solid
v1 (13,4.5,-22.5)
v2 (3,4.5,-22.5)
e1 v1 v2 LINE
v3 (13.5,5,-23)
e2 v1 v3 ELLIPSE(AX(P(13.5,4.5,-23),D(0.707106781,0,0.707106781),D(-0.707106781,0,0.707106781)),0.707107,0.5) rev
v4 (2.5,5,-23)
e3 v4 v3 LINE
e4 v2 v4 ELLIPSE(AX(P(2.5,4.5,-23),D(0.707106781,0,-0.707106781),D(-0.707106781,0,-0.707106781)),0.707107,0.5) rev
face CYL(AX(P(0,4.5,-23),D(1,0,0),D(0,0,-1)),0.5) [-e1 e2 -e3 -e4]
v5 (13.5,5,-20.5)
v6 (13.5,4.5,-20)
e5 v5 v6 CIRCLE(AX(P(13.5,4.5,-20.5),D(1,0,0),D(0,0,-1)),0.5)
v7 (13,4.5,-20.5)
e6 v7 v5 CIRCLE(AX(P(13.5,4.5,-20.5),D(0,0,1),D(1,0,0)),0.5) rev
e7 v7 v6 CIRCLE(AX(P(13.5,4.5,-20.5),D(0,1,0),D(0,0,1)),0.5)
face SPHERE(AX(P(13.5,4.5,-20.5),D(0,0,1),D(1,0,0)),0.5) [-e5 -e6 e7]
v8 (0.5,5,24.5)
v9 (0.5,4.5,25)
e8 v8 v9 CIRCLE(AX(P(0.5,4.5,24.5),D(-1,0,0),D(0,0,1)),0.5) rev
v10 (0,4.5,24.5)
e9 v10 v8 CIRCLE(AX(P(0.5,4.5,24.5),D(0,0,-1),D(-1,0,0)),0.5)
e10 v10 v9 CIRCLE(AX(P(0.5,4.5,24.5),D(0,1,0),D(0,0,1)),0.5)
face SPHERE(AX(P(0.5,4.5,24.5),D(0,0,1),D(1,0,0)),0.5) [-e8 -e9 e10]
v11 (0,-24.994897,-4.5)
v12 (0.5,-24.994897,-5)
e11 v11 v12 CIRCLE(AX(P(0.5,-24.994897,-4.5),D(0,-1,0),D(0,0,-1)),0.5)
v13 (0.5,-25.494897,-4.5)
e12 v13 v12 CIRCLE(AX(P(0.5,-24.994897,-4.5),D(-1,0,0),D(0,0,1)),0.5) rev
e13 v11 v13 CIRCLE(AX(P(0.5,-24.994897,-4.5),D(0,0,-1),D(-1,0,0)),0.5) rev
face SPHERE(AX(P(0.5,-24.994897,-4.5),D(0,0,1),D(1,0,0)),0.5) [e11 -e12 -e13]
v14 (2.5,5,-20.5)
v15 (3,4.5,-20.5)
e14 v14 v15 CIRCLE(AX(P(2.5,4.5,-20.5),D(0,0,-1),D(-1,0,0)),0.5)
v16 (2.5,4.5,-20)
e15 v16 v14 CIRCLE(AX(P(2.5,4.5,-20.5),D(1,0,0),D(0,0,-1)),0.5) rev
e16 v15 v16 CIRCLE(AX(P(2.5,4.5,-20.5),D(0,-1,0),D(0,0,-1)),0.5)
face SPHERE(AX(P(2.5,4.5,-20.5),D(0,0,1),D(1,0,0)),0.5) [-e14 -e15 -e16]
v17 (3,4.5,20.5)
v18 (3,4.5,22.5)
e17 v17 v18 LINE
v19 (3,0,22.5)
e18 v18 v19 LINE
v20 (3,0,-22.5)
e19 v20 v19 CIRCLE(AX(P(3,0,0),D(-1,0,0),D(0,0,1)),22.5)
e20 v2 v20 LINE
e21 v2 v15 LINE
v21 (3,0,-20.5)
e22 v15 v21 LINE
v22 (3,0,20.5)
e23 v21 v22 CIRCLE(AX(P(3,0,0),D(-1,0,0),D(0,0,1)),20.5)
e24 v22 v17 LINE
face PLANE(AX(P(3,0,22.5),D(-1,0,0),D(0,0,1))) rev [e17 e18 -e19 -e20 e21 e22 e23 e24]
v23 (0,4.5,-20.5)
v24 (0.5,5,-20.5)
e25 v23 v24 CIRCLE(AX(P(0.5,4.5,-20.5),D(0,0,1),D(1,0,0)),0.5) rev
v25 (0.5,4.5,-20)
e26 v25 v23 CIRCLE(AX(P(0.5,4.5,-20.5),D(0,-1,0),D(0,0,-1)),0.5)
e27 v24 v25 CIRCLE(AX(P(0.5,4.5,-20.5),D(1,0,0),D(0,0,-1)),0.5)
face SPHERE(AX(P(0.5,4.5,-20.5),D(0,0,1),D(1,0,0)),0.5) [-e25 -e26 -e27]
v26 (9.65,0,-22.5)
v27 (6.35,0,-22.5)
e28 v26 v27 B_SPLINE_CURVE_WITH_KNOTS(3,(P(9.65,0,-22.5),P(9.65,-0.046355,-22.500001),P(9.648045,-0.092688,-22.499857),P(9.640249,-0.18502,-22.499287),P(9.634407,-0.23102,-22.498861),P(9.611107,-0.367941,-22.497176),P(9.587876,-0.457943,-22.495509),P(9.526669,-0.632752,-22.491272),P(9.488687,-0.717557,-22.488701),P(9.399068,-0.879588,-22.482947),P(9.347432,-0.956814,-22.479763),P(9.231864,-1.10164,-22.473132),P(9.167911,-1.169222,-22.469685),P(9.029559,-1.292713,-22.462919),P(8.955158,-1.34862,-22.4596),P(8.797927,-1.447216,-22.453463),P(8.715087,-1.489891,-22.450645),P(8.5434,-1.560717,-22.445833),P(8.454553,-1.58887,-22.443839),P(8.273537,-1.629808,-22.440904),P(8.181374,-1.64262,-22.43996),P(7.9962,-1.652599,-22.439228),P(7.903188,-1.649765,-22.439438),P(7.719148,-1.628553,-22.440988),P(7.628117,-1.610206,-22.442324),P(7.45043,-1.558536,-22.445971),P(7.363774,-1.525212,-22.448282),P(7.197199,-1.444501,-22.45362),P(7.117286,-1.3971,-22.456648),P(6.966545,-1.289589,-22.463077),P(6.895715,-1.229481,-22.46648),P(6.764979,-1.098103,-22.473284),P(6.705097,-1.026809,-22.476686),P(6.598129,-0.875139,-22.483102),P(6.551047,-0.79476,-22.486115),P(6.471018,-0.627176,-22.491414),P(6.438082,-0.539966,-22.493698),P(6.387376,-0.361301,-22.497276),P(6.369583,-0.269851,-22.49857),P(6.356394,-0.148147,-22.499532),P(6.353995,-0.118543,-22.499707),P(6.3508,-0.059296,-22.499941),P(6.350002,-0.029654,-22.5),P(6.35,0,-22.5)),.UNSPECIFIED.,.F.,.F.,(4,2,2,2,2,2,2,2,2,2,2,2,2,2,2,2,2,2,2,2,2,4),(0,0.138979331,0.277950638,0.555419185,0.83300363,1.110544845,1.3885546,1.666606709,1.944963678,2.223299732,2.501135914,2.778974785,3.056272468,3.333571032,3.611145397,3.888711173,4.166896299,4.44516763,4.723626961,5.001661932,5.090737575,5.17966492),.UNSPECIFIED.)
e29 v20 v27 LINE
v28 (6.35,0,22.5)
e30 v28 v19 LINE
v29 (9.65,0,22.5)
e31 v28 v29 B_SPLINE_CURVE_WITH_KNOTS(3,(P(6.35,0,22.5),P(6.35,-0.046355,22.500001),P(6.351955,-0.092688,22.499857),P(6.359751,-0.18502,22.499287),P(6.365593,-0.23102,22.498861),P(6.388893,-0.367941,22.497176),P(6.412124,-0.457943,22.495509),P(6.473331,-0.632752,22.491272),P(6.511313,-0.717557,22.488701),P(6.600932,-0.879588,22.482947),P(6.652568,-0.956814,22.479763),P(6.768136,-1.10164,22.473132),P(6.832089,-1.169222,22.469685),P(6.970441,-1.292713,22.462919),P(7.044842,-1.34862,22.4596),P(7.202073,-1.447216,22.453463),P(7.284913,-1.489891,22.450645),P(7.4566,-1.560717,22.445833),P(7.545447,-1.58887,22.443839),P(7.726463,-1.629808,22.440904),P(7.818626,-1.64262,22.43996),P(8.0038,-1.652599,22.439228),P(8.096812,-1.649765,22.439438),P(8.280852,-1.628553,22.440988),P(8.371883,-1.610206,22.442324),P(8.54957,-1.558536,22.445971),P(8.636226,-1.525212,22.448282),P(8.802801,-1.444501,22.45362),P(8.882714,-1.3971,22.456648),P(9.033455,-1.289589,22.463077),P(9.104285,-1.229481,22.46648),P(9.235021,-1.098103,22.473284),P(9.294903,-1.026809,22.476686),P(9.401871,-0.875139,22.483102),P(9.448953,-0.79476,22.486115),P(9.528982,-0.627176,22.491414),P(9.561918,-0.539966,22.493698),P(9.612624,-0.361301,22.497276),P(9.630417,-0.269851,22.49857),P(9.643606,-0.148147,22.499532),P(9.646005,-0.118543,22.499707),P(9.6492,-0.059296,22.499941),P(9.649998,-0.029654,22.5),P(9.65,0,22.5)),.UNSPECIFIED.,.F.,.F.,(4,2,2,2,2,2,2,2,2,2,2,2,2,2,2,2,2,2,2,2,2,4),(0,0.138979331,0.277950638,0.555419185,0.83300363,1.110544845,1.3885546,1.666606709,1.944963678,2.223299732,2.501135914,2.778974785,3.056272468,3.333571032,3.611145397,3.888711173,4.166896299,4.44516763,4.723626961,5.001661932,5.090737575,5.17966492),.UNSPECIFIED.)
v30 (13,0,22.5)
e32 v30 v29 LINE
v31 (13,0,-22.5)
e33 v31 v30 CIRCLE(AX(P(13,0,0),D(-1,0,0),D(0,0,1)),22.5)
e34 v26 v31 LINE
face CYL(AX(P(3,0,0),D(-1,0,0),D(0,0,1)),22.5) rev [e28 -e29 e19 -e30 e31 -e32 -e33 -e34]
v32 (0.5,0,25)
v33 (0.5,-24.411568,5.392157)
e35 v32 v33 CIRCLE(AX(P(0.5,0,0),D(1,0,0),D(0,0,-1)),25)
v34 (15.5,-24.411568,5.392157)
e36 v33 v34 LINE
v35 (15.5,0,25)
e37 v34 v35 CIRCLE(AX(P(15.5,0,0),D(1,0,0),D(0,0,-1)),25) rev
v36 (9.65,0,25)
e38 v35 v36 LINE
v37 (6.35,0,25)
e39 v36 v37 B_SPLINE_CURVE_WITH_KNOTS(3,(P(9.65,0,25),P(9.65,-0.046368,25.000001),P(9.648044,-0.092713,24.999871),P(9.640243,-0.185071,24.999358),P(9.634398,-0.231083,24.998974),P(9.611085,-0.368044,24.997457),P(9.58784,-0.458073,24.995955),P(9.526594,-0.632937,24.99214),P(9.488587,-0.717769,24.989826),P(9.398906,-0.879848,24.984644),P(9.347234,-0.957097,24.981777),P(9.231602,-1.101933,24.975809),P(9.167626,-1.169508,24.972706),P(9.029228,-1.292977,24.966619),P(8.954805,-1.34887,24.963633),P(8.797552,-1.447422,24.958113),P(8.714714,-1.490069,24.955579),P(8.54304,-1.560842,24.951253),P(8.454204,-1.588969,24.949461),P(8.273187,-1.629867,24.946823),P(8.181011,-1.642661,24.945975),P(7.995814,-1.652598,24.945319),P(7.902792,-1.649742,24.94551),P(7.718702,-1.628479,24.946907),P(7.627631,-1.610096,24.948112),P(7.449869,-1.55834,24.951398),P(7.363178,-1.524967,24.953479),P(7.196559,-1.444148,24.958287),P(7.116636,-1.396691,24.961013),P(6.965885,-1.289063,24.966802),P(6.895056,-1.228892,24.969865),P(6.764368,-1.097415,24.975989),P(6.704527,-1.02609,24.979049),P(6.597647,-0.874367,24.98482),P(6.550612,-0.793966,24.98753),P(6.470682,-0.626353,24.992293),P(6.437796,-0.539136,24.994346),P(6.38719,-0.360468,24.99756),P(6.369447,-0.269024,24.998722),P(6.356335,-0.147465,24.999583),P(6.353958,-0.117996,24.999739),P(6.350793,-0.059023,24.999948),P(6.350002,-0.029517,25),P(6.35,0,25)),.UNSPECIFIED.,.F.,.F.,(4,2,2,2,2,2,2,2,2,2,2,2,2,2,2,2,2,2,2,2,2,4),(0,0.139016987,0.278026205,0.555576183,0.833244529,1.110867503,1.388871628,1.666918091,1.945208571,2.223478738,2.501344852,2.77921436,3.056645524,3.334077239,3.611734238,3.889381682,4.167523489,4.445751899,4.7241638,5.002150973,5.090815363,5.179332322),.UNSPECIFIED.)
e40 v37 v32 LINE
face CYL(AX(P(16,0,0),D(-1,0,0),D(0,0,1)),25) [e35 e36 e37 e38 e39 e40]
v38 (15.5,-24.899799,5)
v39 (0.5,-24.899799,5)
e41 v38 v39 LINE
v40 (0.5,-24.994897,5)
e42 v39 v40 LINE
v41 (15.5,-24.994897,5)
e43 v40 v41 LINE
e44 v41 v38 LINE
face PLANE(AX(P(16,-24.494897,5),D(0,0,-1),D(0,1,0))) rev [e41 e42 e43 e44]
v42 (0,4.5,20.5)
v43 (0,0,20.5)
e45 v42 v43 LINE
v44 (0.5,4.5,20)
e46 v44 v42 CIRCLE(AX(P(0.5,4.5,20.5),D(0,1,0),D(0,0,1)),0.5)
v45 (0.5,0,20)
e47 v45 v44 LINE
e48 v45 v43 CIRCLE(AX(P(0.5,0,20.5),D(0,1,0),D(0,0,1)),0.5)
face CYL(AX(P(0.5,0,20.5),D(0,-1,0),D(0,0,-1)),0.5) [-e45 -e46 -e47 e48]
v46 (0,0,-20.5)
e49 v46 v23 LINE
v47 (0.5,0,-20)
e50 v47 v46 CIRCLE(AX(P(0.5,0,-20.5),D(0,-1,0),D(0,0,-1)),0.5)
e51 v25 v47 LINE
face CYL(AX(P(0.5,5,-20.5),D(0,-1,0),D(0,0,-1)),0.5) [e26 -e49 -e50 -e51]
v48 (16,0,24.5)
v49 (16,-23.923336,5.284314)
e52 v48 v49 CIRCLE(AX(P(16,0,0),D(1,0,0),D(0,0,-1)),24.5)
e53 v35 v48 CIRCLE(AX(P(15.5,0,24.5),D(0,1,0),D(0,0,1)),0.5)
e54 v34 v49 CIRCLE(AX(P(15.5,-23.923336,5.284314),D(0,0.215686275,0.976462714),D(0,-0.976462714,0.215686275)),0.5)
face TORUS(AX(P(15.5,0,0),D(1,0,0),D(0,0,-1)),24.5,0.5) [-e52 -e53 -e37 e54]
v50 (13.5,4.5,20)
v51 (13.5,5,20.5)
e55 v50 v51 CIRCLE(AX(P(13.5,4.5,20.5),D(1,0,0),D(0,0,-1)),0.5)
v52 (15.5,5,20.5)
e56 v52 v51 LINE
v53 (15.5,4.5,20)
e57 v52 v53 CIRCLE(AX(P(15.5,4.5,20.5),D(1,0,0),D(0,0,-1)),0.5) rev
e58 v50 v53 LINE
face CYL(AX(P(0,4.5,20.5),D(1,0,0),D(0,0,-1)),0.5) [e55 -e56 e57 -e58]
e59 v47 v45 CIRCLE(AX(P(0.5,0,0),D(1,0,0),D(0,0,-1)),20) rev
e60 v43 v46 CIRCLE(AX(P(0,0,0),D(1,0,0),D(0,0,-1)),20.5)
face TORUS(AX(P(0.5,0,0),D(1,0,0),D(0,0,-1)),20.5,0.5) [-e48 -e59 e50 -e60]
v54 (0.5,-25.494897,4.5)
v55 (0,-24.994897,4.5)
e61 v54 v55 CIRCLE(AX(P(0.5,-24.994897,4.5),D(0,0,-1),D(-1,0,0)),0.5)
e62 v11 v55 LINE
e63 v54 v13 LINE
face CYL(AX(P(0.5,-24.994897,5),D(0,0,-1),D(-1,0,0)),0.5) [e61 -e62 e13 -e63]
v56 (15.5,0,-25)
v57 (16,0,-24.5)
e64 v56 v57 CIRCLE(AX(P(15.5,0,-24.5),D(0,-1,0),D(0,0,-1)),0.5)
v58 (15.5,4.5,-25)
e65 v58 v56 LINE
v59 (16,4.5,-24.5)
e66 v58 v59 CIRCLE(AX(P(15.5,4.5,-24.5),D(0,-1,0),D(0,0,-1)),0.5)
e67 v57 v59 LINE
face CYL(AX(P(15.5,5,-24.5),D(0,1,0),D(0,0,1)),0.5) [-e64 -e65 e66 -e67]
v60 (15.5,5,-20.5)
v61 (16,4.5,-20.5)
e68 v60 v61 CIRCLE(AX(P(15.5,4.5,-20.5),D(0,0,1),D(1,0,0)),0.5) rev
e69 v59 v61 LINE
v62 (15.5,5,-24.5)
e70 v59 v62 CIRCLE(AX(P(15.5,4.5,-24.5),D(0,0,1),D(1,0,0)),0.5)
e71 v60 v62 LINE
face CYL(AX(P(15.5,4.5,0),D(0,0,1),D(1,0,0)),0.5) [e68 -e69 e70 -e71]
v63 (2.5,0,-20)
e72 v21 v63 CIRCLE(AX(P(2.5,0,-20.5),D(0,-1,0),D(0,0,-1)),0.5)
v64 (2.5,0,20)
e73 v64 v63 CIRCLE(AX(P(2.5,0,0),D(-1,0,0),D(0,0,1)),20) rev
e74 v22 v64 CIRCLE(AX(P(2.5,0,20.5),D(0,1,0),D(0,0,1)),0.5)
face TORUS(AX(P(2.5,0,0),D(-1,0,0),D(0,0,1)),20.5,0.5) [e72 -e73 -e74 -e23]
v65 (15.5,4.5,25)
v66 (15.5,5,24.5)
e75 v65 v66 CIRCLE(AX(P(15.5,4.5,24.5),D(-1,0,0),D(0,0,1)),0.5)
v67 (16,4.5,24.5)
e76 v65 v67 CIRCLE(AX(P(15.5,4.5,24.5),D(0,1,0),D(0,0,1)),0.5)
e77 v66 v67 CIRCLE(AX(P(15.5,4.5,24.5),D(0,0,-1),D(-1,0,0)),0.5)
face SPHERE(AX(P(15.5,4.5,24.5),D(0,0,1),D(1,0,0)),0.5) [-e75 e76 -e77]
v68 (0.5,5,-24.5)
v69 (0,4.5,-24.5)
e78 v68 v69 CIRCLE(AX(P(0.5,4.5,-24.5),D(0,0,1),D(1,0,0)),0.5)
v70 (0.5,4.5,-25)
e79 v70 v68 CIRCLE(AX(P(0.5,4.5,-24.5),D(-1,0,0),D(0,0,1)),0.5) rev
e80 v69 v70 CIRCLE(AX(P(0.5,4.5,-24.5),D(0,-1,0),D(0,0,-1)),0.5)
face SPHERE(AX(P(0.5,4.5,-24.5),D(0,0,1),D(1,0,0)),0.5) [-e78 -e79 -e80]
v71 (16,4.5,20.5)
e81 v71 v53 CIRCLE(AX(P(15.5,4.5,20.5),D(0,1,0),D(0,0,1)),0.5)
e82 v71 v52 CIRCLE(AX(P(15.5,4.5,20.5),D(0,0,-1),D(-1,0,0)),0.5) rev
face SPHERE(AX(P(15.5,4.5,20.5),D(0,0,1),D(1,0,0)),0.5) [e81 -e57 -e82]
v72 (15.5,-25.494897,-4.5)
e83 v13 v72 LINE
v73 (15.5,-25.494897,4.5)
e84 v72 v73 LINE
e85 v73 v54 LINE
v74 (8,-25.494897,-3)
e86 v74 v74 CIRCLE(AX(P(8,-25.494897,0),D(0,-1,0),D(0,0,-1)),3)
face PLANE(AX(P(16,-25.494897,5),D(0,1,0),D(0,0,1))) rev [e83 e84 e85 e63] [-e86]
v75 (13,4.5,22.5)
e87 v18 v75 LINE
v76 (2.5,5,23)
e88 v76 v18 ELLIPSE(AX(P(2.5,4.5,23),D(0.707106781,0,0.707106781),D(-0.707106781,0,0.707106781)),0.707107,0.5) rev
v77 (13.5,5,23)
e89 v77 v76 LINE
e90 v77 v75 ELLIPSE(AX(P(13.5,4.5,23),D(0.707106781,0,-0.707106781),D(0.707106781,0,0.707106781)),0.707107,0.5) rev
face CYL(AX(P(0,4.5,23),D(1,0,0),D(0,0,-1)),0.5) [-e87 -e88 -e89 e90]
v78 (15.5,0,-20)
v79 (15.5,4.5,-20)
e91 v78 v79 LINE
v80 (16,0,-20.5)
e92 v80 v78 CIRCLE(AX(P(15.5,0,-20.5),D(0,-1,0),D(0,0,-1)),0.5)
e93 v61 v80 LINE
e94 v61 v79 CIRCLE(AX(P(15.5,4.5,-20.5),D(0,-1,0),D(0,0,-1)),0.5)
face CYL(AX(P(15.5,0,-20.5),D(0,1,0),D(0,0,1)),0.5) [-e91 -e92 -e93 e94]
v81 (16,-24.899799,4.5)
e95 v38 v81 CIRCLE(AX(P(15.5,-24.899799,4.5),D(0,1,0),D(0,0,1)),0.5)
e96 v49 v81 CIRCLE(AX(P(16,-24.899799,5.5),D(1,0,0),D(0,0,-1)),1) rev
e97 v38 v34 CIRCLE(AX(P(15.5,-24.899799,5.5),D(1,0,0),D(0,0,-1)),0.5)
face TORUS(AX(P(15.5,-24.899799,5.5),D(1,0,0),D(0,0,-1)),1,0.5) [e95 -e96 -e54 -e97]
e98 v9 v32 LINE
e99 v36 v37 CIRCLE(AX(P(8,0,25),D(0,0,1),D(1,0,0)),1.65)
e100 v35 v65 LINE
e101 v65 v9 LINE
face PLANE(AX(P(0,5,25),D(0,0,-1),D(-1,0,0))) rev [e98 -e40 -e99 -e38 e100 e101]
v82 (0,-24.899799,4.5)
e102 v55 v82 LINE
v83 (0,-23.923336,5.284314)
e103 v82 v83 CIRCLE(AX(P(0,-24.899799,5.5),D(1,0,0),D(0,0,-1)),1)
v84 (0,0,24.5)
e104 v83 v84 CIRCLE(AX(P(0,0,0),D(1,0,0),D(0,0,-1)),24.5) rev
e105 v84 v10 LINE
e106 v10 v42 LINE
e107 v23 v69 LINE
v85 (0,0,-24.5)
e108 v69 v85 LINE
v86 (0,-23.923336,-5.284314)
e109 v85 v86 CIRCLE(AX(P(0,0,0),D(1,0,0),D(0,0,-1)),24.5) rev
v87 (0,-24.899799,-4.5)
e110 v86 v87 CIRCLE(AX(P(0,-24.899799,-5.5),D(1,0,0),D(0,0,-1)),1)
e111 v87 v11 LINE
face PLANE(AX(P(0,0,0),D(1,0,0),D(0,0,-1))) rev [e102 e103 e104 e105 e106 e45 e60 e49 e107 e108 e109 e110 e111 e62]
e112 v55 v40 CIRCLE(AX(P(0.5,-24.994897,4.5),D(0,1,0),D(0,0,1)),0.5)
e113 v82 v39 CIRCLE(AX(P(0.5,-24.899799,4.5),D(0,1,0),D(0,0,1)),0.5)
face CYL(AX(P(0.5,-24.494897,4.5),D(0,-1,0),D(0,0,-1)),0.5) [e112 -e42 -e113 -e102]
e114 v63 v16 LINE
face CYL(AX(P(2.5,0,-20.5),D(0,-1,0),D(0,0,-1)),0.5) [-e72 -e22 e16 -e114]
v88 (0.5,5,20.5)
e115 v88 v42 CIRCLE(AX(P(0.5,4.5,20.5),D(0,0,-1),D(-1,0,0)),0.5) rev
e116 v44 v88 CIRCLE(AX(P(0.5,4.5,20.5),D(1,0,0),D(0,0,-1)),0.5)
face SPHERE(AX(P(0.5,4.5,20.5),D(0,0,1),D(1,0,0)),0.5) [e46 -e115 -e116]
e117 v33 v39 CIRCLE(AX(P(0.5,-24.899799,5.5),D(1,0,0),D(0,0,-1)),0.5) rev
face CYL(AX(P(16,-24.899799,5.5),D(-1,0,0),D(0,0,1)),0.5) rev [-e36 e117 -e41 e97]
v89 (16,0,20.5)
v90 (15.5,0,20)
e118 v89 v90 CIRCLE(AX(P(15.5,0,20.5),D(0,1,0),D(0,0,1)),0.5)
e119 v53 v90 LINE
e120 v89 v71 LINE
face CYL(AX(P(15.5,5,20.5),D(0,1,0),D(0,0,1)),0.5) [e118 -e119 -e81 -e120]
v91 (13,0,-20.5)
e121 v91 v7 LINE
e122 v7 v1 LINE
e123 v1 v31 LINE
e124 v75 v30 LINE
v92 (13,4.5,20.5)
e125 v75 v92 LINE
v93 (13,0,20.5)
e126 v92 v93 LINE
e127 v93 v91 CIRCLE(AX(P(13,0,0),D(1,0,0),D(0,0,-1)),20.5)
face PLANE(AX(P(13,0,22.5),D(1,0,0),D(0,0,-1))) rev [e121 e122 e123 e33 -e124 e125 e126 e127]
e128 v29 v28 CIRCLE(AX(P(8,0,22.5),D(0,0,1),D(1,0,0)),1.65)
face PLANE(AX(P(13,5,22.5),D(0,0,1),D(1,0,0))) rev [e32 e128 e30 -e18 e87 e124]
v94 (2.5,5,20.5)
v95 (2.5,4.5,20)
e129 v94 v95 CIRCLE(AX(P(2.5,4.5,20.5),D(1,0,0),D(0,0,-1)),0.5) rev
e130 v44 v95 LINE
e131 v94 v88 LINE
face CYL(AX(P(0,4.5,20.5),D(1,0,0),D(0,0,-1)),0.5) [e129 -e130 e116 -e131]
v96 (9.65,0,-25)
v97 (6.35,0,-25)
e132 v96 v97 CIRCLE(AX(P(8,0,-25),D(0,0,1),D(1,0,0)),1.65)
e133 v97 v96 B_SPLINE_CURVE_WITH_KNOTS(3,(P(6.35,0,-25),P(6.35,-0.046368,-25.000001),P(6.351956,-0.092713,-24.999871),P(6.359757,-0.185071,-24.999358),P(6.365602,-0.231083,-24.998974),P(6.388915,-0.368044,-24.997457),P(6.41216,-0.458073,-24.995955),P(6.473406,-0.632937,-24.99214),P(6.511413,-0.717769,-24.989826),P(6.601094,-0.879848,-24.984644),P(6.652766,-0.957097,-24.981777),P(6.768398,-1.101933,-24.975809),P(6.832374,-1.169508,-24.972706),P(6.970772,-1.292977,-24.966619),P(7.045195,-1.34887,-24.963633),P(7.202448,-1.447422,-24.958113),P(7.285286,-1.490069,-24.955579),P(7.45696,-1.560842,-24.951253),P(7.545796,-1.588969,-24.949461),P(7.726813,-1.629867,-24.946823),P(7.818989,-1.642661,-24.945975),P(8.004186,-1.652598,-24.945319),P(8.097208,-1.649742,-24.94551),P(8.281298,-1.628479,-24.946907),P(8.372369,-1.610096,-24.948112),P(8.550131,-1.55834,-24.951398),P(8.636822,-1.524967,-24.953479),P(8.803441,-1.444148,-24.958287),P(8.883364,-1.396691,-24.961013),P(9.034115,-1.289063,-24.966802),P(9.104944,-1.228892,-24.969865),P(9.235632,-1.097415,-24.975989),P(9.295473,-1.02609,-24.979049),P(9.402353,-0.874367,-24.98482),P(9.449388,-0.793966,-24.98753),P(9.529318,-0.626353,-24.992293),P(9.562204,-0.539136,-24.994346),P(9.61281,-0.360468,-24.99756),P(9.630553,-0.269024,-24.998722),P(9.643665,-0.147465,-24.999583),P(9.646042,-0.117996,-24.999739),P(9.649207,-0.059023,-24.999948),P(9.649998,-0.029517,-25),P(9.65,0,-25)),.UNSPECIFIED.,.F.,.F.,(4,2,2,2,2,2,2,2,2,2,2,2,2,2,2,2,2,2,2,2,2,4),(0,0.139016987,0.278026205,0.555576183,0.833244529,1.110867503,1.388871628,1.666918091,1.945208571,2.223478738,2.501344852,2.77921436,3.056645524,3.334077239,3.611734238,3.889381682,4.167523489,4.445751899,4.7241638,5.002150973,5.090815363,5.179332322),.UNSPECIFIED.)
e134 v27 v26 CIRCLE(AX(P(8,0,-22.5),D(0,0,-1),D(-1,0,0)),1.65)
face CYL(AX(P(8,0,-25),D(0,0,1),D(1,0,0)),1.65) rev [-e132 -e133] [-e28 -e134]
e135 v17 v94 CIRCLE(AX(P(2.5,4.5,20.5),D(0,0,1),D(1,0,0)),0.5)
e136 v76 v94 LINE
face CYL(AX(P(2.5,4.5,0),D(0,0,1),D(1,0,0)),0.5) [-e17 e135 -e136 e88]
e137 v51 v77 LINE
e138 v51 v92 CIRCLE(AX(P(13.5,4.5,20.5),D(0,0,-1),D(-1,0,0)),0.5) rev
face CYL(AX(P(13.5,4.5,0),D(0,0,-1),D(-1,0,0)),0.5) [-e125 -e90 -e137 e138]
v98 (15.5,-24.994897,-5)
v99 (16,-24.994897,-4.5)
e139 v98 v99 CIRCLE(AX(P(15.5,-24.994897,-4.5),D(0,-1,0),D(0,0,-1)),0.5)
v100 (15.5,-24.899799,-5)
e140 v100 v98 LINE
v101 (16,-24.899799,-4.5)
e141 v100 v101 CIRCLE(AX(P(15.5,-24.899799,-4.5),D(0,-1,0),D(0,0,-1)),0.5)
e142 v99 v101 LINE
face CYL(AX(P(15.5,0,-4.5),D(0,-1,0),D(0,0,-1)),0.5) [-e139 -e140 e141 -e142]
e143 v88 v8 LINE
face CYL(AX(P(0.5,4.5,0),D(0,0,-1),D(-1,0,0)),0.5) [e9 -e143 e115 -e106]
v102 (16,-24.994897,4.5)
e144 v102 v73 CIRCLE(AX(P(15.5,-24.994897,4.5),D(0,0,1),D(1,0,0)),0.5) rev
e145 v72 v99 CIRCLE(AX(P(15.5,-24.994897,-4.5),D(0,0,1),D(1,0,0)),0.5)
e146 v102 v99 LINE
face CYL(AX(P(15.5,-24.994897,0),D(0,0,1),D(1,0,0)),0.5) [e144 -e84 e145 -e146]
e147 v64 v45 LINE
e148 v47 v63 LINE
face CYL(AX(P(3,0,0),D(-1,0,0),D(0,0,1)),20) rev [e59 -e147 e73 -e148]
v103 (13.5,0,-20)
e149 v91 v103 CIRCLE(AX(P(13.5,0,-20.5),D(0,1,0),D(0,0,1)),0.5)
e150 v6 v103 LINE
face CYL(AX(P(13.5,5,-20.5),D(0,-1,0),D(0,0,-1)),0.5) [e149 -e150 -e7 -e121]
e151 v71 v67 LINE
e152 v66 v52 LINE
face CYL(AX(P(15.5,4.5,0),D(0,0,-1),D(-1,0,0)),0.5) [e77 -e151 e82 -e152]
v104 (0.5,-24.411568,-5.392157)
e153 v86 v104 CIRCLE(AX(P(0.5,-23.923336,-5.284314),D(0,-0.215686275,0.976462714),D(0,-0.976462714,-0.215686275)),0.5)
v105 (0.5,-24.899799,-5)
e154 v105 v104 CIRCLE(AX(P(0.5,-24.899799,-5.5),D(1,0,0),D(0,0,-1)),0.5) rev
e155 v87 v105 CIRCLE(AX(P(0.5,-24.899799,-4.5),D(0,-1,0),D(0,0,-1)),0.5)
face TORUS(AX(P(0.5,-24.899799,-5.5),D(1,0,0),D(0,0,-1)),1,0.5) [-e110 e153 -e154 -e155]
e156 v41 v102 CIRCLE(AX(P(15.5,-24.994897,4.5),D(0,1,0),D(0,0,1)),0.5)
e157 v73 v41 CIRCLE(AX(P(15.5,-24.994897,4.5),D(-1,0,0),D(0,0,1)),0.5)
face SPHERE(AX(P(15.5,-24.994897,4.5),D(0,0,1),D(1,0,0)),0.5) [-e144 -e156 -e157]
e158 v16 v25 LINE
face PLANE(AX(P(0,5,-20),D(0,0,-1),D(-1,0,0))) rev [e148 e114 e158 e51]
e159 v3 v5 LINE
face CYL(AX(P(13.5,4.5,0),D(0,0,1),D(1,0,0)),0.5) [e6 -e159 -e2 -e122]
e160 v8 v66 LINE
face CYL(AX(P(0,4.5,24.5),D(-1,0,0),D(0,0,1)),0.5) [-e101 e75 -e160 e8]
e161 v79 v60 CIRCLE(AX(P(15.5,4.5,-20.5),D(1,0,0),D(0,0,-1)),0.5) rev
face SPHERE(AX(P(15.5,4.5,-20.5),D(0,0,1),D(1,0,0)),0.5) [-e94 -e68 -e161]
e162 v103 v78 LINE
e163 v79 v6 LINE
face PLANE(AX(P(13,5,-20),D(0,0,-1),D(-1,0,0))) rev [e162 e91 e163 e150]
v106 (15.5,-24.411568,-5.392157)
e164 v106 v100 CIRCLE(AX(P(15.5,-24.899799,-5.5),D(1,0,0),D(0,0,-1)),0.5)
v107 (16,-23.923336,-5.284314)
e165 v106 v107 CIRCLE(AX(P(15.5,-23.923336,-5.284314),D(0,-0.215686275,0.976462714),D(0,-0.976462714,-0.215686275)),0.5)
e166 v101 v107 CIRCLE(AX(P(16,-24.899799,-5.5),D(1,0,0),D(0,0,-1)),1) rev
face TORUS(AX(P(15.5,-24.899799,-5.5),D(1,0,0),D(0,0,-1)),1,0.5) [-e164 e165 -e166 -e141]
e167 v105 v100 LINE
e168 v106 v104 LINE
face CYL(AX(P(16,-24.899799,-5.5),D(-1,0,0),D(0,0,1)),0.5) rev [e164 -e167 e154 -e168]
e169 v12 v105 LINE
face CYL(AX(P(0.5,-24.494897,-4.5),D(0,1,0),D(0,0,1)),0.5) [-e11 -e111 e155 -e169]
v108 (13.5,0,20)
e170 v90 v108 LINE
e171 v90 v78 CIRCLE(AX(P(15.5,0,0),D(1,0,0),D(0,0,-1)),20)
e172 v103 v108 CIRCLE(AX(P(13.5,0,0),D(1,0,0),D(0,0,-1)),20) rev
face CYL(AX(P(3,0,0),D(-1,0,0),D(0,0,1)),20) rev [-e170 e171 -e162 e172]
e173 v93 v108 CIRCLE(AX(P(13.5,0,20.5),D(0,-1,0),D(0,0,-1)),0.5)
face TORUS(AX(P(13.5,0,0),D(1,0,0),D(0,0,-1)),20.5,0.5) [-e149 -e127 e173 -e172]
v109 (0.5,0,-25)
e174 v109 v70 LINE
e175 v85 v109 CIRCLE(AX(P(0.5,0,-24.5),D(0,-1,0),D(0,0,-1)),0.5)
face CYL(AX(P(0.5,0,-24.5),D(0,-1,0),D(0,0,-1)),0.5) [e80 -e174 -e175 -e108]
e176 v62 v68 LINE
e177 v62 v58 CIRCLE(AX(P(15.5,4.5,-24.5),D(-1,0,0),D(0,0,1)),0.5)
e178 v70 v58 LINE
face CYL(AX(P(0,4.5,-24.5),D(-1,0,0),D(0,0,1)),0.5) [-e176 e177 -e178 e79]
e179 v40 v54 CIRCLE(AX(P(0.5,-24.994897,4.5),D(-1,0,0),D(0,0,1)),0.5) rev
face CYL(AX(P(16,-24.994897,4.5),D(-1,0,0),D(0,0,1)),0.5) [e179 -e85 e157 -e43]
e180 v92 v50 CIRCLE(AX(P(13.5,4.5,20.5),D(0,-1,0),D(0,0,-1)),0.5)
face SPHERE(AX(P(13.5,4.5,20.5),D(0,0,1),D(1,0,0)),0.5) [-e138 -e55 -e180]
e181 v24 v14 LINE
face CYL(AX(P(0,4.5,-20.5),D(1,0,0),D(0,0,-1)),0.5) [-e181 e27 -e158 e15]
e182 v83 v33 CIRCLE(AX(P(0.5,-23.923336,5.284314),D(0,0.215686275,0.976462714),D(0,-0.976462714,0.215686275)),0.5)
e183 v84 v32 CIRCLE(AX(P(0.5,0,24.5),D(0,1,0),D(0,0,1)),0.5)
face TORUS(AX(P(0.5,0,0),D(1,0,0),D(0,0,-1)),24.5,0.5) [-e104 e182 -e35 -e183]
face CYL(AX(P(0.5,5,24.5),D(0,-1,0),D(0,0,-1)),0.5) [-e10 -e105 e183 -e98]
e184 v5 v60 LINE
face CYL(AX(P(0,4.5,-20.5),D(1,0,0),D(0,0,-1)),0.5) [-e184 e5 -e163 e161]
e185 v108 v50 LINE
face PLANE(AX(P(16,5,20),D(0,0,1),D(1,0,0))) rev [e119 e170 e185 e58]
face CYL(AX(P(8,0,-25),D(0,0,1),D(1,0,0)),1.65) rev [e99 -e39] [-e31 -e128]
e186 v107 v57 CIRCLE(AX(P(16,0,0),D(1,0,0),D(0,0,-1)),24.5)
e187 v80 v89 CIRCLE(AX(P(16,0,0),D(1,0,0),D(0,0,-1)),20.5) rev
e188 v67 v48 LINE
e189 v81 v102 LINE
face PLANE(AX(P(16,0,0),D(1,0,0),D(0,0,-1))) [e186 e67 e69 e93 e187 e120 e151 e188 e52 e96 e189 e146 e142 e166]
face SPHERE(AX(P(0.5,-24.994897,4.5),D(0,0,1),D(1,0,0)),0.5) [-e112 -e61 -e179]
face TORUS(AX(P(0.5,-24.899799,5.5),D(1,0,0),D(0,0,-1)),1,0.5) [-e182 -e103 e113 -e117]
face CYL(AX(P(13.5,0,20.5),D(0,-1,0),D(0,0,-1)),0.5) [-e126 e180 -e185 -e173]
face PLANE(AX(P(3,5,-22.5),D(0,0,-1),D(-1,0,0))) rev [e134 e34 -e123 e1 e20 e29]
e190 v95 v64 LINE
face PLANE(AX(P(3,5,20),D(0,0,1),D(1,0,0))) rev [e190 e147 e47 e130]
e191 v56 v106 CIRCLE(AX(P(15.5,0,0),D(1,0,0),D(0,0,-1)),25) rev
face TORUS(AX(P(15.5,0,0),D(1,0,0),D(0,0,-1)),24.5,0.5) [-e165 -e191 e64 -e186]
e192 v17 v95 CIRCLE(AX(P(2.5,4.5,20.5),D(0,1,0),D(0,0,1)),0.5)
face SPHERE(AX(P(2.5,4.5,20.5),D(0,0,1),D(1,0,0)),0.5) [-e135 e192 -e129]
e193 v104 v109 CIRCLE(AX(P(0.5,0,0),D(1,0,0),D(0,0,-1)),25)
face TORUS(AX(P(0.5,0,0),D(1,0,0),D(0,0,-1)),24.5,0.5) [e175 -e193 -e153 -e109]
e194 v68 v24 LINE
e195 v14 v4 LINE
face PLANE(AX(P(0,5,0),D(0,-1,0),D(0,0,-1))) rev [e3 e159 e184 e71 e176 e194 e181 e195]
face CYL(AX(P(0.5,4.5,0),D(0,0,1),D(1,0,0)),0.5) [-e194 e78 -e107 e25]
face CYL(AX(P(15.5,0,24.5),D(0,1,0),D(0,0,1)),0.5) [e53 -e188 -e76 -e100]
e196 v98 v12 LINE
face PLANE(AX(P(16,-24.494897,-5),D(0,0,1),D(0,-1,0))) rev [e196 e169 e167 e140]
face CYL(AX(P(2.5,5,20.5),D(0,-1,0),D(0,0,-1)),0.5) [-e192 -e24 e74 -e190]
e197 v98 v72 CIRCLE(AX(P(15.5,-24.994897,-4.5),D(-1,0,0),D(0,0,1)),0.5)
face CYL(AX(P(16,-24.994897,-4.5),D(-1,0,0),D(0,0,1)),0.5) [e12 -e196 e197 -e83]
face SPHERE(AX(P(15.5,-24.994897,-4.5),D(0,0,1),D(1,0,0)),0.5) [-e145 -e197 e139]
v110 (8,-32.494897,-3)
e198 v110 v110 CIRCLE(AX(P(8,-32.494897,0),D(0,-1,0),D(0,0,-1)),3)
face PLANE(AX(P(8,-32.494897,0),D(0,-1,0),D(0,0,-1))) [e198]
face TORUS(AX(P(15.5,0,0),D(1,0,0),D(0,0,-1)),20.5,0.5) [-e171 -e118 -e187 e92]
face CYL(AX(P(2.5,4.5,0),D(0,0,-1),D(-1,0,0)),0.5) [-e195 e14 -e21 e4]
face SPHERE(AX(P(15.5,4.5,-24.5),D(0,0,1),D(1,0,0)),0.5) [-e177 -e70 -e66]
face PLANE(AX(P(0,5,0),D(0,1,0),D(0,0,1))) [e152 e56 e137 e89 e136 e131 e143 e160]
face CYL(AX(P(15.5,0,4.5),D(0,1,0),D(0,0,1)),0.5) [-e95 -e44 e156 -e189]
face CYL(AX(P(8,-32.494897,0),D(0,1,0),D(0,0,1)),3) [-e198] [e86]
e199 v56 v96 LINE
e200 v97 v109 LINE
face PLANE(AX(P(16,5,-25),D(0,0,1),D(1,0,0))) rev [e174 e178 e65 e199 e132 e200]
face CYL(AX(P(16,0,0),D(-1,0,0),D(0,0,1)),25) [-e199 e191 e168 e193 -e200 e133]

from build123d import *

# Parameters (mm, degrees)
BOSS_EXTRUDE1_DEPTH = 16
SKETCH4_R           = 2.999999999999999
BOSS_EXTRUDE2_DEPTH = 7
BOSS_EXTRUDE3_DEPTH = 5
SKETCH19_R          = 1.6500000000000006
CUT_EXTRUDE1_DEPTH  = 62.74073500409036
FILLET3_R           = 0.5
FILLET5_R           = 0.5
FILLET6_R           = 0.5


with BuildPart() as part:
    # Sketch1 → Boss-Extrude1 (new body)
    with BuildSketch(Plane(origin=(0, 0, 0), x_dir=(0, 0, -1), z_dir=(1, 0, 0))):
        with BuildLine():
            Line((-25, 0), (25, 0))
            ThreePointArc((25, 0), (19.364916731037084, -15.811388300841896), (4.999999999999999, -24.49489742783178))
            Line((4.999999999999999, -24.49489742783178), (5, -25.494897427831784))
            Line((5, -25.494897427831784), (-5, -25.494897427831784))
            Line((-5, -25.494897427831784), (-4.999999999999999, -24.49489742783178))
            ThreePointArc((-4.999999999999999, -24.49489742783178), (-19.364916731037088, -15.811388300841891), (-25, 0))
        make_face()
    extrude(amount=BOSS_EXTRUDE1_DEPTH)

    # Sketch2 → Cut-Revolve3 (revolve, cut)
    with BuildSketch(Plane(origin=(0, 0, 0), x_dir=(1, 0, 0), z_dir=(0, 1, 0))):
        Polygon((2.999999999999999, -22.5), (12.999999999999995, -22.5), (13.000000000000002, -20), (16, -20), (16, 0), (13.000000000000002, 0), (3, 0), (0, 0), (0, -20), (2.999999999999999, -20), align=None)
    revolve(axis=Axis((3, 0, 0), (1, 0, 0)), mode=Mode.SUBTRACT)

    # Sketch4 → Boss-Extrude2 (add)
    with BuildSketch(Plane.XZ.offset(25.494897427831784)):
        with Locations(Location((8, 0, 0), (0, 0, 270))):
            Circle(SKETCH4_R)
    extrude(amount=BOSS_EXTRUDE2_DEPTH)

    # Sketch18 → Boss-Extrude3 (add)
    with BuildSketch(Plane(origin=(0, 0, 0), x_dir=(1, 0, 0), z_dir=(0, 1, 0))):
        Polygon((16, -25), (16, -20), (13.000000000000002, -20), (12.999999999999995, -22.5), (2.999999999999999, -22.5), (2.999999999999999, -20), (0, -20), (0, -25), align=None)
        Polygon((12.999999999999995, 22.5), (13.000000000000002, 20), (16, 20), (16, 25), (0, 25), (0, 20), (2.999999999999999, 20), (2.999999999999999, 22.5), align=None)
    extrude(amount=BOSS_EXTRUDE3_DEPTH)

    # Sketch19 → Cut-Extrude1 (cut, through all)
    with BuildSketch(Plane.XY.offset(25)):
        with Locations((8, 0)):
            Circle(SKETCH19_R)
    extrude(amount=-CUT_EXTRUDE1_DEPTH, mode=Mode.SUBTRACT)

    # Fillet3
    fillet3_edges = [part.edges().sort_by_distance(p)[0] for p in [
        (8, -24.49489742783178, -5),
        (8, -25.494897427831784, -5),
        (8, -25.494897427831784, 5),
        (8, -24.49489742783178, 5),
        (16, -25.494897427831784, 0),
        (8, 5, 25),
        (16, 5, 22.5),
        (14.5, 5, 20),
        (12.999999999999998, 5, 21.25),
        (7.9999999999999964, 5, 22.5),
        (2.999999999999999, 5, 21.25),
        (1.4999999999999996, 5, 20),
        (0, 5, 22.5),
        (7.999999999999997, 5, -22.5),
        (12.999999999999998, 5, -21.25),
        (14.5, 5, -20),
        (16, 5, -22.5),
        (8, 5, -25),
        (0, 5, -22.5),
        (1.4999999999999996, 5, -20),
        (2.999999999999999, 5, -21.25),
        (0, -25.494897427831784, 0),
    ]]
    fillet(fillet3_edges, radius=FILLET3_R)

    # Fillet5
    # the kernel refuses this fillet: 0.5 mm, written as the material it takes off along each edge
    with BuildSketch(Plane(origin=(13.500000000000117, 4.5, 20.5), x_dir=(-1, 0, 2.84e-15), z_dir=(0, 0, -1))) as fillet5_piece_1_section:
        Polygon((0, 0), (FILLET5_R, 0), (FILLET5_R, FILLET5_R), (0, FILLET5_R), align=None)
    fillet5_piece_1 = extrude(amount=FILLET5_R, mode=Mode.PRIVATE)
    fillet5_piece_1 = fillet5_piece_1 - Plane(origin=(13.500000000000117, 4.5, 20.5), x_dir=(0.7071067811865475, -0.7071067811865475, -2.009718347115232e-15), z_dir=(0, 0, -1)) * Sphere(FILLET5_R, mode=Mode.PRIVATE)
    add(fillet5_piece_1, mode=Mode.SUBTRACT)
    with BuildSketch(Plane(origin=(15.5, 4.5, 20.5), x_dir=(0, 0, -1), z_dir=(1, 0, 0))) as fillet5_piece_2_section:
        Polygon((0, 0), (FILLET5_R, 0), (FILLET5_R, FILLET5_R), (0, FILLET5_R), align=None)
    fillet5_piece_2 = extrude(amount=FILLET5_R, mode=Mode.PRIVATE)
    fillet5_piece_2 = fillet5_piece_2 - Plane(origin=(15.5, 4.5, 20.5), x_dir=(0, -0.7071067811865475, 0.7071067811865475), z_dir=(1, 0, 0)) * Sphere(FILLET5_R, mode=Mode.PRIVATE)
    add(fillet5_piece_2, mode=Mode.SUBTRACT)
    with BuildSketch(Plane(origin=(2.499999999999999, 4.5, 20.5), x_dir=(1, 0, 0), z_dir=(0, 0, -1))) as fillet5_piece_3_section:
        Polygon((0, 0), (FILLET5_R, 0), (FILLET5_R, -FILLET5_R), (0, -FILLET5_R), align=None)
    fillet5_piece_3 = extrude(amount=FILLET5_R, mode=Mode.PRIVATE)
    fillet5_piece_3 = fillet5_piece_3 - Plane(origin=(2.499999999999999, 4.5, 20.5), x_dir=(-0.7071067811865475, -0.7071067811865475, 0), z_dir=(0, 0, -1)) * Sphere(FILLET5_R, mode=Mode.PRIVATE)
    add(fillet5_piece_3, mode=Mode.SUBTRACT)
    with BuildSketch(Plane(origin=(0.5, 4.5, 20.5), x_dir=(0, 0, -1), z_dir=(-1, 0, 0))) as fillet5_piece_4_section:
        Polygon((0, 0), (FILLET5_R, 0), (FILLET5_R, -FILLET5_R), (0, -FILLET5_R), align=None)
    fillet5_piece_4 = extrude(amount=FILLET5_R, mode=Mode.PRIVATE)
    fillet5_piece_4 = fillet5_piece_4 - Plane(origin=(0.5, 4.5, 20.5), x_dir=(0, -0.7071067811865475, 0.7071067811865475), z_dir=(-1, 0, 0)) * Sphere(FILLET5_R, mode=Mode.PRIVATE)
    add(fillet5_piece_4, mode=Mode.SUBTRACT)
    with BuildSketch(Plane(origin=(15.5, 4.5, -20.5), x_dir=(0, 0, 1), z_dir=(1, 0, 0))) as fillet5_piece_5_section:
        Polygon((0, 0), (FILLET5_R, 0), (FILLET5_R, -FILLET5_R), (0, -FILLET5_R), align=None)
    fillet5_piece_5 = extrude(amount=FILLET5_R, mode=Mode.PRIVATE)
    fillet5_piece_5 = fillet5_piece_5 - Plane(origin=(15.5, 4.5, -20.5), x_dir=(0, -0.7071067811865475, -0.7071067811865475), z_dir=(1, 0, 0)) * Sphere(FILLET5_R, mode=Mode.PRIVATE)
    add(fillet5_piece_5, mode=Mode.SUBTRACT)
    with BuildSketch(Plane(origin=(13.5, 4.5, -20.5), x_dir=(-1, 0, 2.84e-15), z_dir=(0, 0, 1))) as fillet5_piece_6_section:
        Polygon((0, 0), (FILLET5_R, 0), (FILLET5_R, -FILLET5_R), (0, -FILLET5_R), align=None)
    fillet5_piece_6 = extrude(amount=FILLET5_R, mode=Mode.PRIVATE)
    fillet5_piece_6 = fillet5_piece_6 - Plane(origin=(13.5, 4.5, -20.5), x_dir=(0.7071067811865475, -0.7071067811865475, -2.009718347115232e-15), z_dir=(0, 0, 1)) * Sphere(FILLET5_R, mode=Mode.PRIVATE)
    add(fillet5_piece_6, mode=Mode.SUBTRACT)
    with BuildSketch(Plane(origin=(0.5, 4.5, -20.5), x_dir=(0, 0, 1), z_dir=(-1, 0, 0))) as fillet5_piece_7_section:
        Polygon((0, 0), (FILLET5_R, 0), (FILLET5_R, FILLET5_R), (0, FILLET5_R), align=None)
    fillet5_piece_7 = extrude(amount=FILLET5_R, mode=Mode.PRIVATE)
    fillet5_piece_7 = fillet5_piece_7 - Plane(origin=(0.5, 4.5, -20.5), x_dir=(0, -0.7071067811865475, -0.7071067811865475), z_dir=(-1, 0, 0)) * Sphere(FILLET5_R, mode=Mode.PRIVATE)
    add(fillet5_piece_7, mode=Mode.SUBTRACT)
    with BuildSketch(Plane(origin=(2.499999999999999, 4.5, -20.5), x_dir=(1, 0, 0), z_dir=(0, 0, 1))) as fillet5_piece_8_section:
        Polygon((0, 0), (FILLET5_R, 0), (FILLET5_R, FILLET5_R), (0, FILLET5_R), align=None)
    fillet5_piece_8 = extrude(amount=FILLET5_R, mode=Mode.PRIVATE)
    fillet5_piece_8 = fillet5_piece_8 - Plane(origin=(2.499999999999999, 4.5, -20.5), x_dir=(-0.7071067811865475, -0.7071067811865475, 0), z_dir=(0, 0, 1)) * Sphere(FILLET5_R, mode=Mode.PRIVATE)
    add(fillet5_piece_8, mode=Mode.SUBTRACT)
    with BuildSketch(Plane(origin=(0, 0, 20), x_dir=(0, 0, 1), z_dir=(0, 1, 0))) as fillet5_piece_9:
        with BuildLine():
            CenterArc((FILLET5_R, FILLET5_R), FILLET5_R, 180, 90)
            Line((0, FILLET5_R), (0, 0))
            Line((0, 0), (FILLET5_R, 0))
        make_face()
    extrude(amount=4.5, mode=Mode.SUBTRACT)
    with BuildSketch(Plane(origin=(0, 0, -20), x_dir=(0, 0, -1), z_dir=(0, 1, 0))) as fillet5_piece_10:
        with BuildLine():
            CenterArc((FILLET5_R, -FILLET5_R), FILLET5_R, 90, 90)
            Line((0, -FILLET5_R), (0, 0))
            Line((0, 0), (FILLET5_R, 0))
        make_face()
    extrude(amount=4.5, mode=Mode.SUBTRACT)
    with BuildSketch(Plane(origin=(2.999999999999999, 0, 20), x_dir=(-1, 0, 0), z_dir=(0, 1, 0))) as fillet5_piece_11:
        with BuildLine():
            CenterArc((FILLET5_R, FILLET5_R), FILLET5_R, 180, 90)
            Line((0, FILLET5_R), (0, 0))
            Line((0, 0), (FILLET5_R, 0))
        make_face()
    extrude(amount=4.5, mode=Mode.SUBTRACT)
    with BuildSketch(Plane(origin=(2.999999999999999, 0, -20), x_dir=(-1, 0, 0), z_dir=(0, 1, 0))) as fillet5_piece_12:
        with BuildLine():
            CenterArc((FILLET5_R, -FILLET5_R), FILLET5_R, 90, 90)
            Line((0, -FILLET5_R), (0, 0))
            Line((0, 0), (FILLET5_R, 0))
        make_face()
    extrude(amount=4.5, mode=Mode.SUBTRACT)
    with BuildSketch(Plane(origin=(13.000000000000002, 0, 20), x_dir=(1, 0, 0), z_dir=(0, 1, 0))) as fillet5_piece_13:
        with BuildLine():
            CenterArc((FILLET5_R, -FILLET5_R), FILLET5_R, 90, 90)
            Line((1.78e-15, -FILLET5_R), (0, 0))
            Line((0, 0), (FILLET5_R, 0))
        make_face()
    extrude(amount=4.5, mode=Mode.SUBTRACT)
    with BuildSketch(Plane(origin=(13.000000000000002, 0, -20), x_dir=(1, 0, 0), z_dir=(0, 1, 0))) as fillet5_piece_14:
        with BuildLine():
            CenterArc((FILLET5_R, FILLET5_R), FILLET5_R, 180, 90)
            Line((-1.78e-15, FILLET5_R), (0, 0))
            Line((0, 0), (FILLET5_R, 0))
        make_face()
    extrude(amount=4.5, mode=Mode.SUBTRACT)
    with BuildSketch(Plane(origin=(16, 0, 20), x_dir=(0, 0, 1), z_dir=(0, 1, 0))) as fillet5_piece_15:
        with BuildLine():
            CenterArc((FILLET5_R, -FILLET5_R), FILLET5_R, 90, 90)
            Line((0, -FILLET5_R), (0, 0))
            Line((0, 0), (FILLET5_R, 0))
        make_face()
    extrude(amount=4.5, mode=Mode.SUBTRACT)
    with BuildSketch(Plane(origin=(16, 0, -20), x_dir=(0, 0, -1), z_dir=(0, 1, 0))) as fillet5_piece_16:
        with BuildLine():
            CenterArc((FILLET5_R, FILLET5_R), FILLET5_R, 180, 90)
            Line((0, FILLET5_R), (0, 0))
            Line((0, 0), (FILLET5_R, 0))
        make_face()
    extrude(amount=4.5, mode=Mode.SUBTRACT)
    with BuildSketch(Plane(origin=(0, 0, 0), x_dir=(0, 0, 1), z_dir=(0, 1, 0))) as fillet5_piece_17:
        with BuildLine():
            CenterArc((20 + FILLET5_R, FILLET5_R), FILLET5_R, 180, 90)
            Line((20, FILLET5_R), (20, 0))
            Line((20, 0), (20 + FILLET5_R, 0))
        make_face()
    revolve(axis=Axis((0, 0, 0), (1, 0, 0)), revolution_arc=180, mode=Mode.SUBTRACT)
    with BuildSketch(Plane(origin=(16, 0, 0), x_dir=(0, 0, 1), z_dir=(0, 1, 0))) as fillet5_piece_18:
        with BuildLine():
            CenterArc((20 + FILLET5_R, -FILLET5_R), FILLET5_R, 90, 90)
            Line((20, -FILLET5_R), (20, 0))
            Line((20, 0), (20 + FILLET5_R, 0))
        make_face()
    revolve(axis=Axis((16, 0, 0), (1, 0, 0)), revolution_arc=180, mode=Mode.SUBTRACT)
    with BuildSketch(Plane(origin=(13.000000000000002, 0, 0), x_dir=(0, 0, 1), z_dir=(0, 1, 0))) as fillet5_piece_19:
        with BuildLine():
            CenterArc((20 + FILLET5_R, FILLET5_R), FILLET5_R, 180, 90)
            Line((20 + FILLET5_R, 1.78e-15), (20, 0))
            Line((20, 0), (20, FILLET5_R))
        make_face()
    revolve(axis=Axis((13.000000000000002, 0, 0), (1, 0, 0)), revolution_arc=180, mode=Mode.SUBTRACT)
    with BuildSketch(Plane(origin=(2.999999999999999, 0, 0), x_dir=(0, 0, 1), z_dir=(0, 1, 0))) as fillet5_piece_20:
        with BuildLine():
            CenterArc((20 + FILLET5_R, -FILLET5_R), FILLET5_R, 90, 90)
            Line((20 + FILLET5_R, 0), (20, 0))
            Line((20, 0), (20, -FILLET5_R))
        make_face()
    revolve(axis=Axis((2.999999999999999, 0, 0), (1, 0, 0)), revolution_arc=180, mode=Mode.SUBTRACT)

    # Fillet6
    # the kernel refuses this fillet: 0.5 mm, written as the material it takes off along each edge
    with BuildSketch(Plane(origin=(15.5, 4.5, 24.5), x_dir=(1, 0, 0), z_dir=(0, 0, 1))) as fillet6_piece_1_section:
        Polygon((0, 0), (FILLET6_R, 0), (FILLET6_R, FILLET6_R), (0, FILLET6_R), align=None)
    fillet6_piece_1 = extrude(amount=FILLET6_R, mode=Mode.PRIVATE)
    fillet6_piece_1 = fillet6_piece_1 - Plane(origin=(15.5, 4.5, 24.5), x_dir=(-0.7071067811865475, -0.7071067811865475, 0), z_dir=(0, 0, 1)) * Sphere(FILLET6_R, mode=Mode.PRIVATE)
    add(fillet6_piece_1, mode=Mode.SUBTRACT)
    with BuildSketch(Plane(origin=(0.5, 4.5, 24.5), x_dir=(0, 0, 1), z_dir=(-1, 0, 0))) as fillet6_piece_2_section:
        Polygon((0, 0), (FILLET6_R, 0), (FILLET6_R, FILLET6_R), (0, FILLET6_R), align=None)
    fillet6_piece_2 = extrude(amount=FILLET6_R, mode=Mode.PRIVATE)
    fillet6_piece_2 = fillet6_piece_2 - Plane(origin=(0.5, 4.5, 24.5), x_dir=(0, -0.7071067811865475, -0.7071067811865475), z_dir=(-1, 0, 0)) * Sphere(FILLET6_R, mode=Mode.PRIVATE)
    add(fillet6_piece_2, mode=Mode.SUBTRACT)
    with BuildSketch(Plane(origin=(15.5, 4.5, -24.5), x_dir=(1, 0, 0), z_dir=(0, 0, -1))) as fillet6_piece_3_section:
        Polygon((0, 0), (FILLET6_R, 0), (FILLET6_R, -FILLET6_R), (0, -FILLET6_R), align=None)
    fillet6_piece_3 = extrude(amount=FILLET6_R, mode=Mode.PRIVATE)
    fillet6_piece_3 = fillet6_piece_3 - Plane(origin=(15.5, 4.5, -24.5), x_dir=(-0.7071067811865475, -0.7071067811865475, 0), z_dir=(0, 0, -1)) * Sphere(FILLET6_R, mode=Mode.PRIVATE)
    add(fillet6_piece_3, mode=Mode.SUBTRACT)
    with BuildSketch(Plane(origin=(0.5, 4.5, -24.5), x_dir=(0, 0, -1), z_dir=(-1, 0, 0))) as fillet6_piece_4_section:
        Polygon((0, 0), (FILLET6_R, 0), (FILLET6_R, -FILLET6_R), (0, -FILLET6_R), align=None)
    fillet6_piece_4 = extrude(amount=FILLET6_R, mode=Mode.PRIVATE)
    fillet6_piece_4 = fillet6_piece_4 - Plane(origin=(0.5, 4.5, -24.5), x_dir=(0, -0.7071067811865475, 0.7071067811865475), z_dir=(-1, 0, 0)) * Sphere(FILLET6_R, mode=Mode.PRIVATE)
    add(fillet6_piece_4, mode=Mode.SUBTRACT)
    with BuildSketch(Plane(origin=(0.5, -24.994897427831784, 4.5), x_dir=(0, 8.9e-16, 1), z_dir=(-1, 0, 0))) as fillet6_piece_5_section:
        Polygon((0, 0), (FILLET6_R, 0), (FILLET6_R, -FILLET6_R), (-4.4e-16, -FILLET6_R), align=None)
    fillet6_piece_5 = extrude(amount=FILLET6_R, mode=Mode.PRIVATE)
    fillet6_piece_5 = fillet6_piece_5 - Plane(origin=(0.5, -24.994897427831784, 4.5), x_dir=(0, 0.7071067811865471, -0.7071067811865478), z_dir=(-1, 0, 0)) * Sphere(FILLET6_R, mode=Mode.PRIVATE)
    add(fillet6_piece_5, mode=Mode.SUBTRACT)
    with BuildSketch(Plane(origin=(0.5, -24.994897427831784, -4.499999999999999), x_dir=(0, 8.9e-16, -1), z_dir=(-1, 0, 0))) as fillet6_piece_6_section:
        Polygon((0, 0), (FILLET6_R, 0), (FILLET6_R, FILLET6_R), (-4.4e-16, FILLET6_R), align=None)
    fillet6_piece_6 = extrude(amount=FILLET6_R, mode=Mode.PRIVATE)
    fillet6_piece_6 = fillet6_piece_6 - Plane(origin=(0.5, -24.994897427831784, -4.499999999999999), x_dir=(0, 0.7071067811865471, 0.7071067811865478), z_dir=(-1, 0, 0)) * Sphere(FILLET6_R, mode=Mode.PRIVATE)
    add(fillet6_piece_6, mode=Mode.SUBTRACT)
    with BuildSketch(Plane(origin=(15.5, -24.994897427831784, 4.5), x_dir=(1, 0, 0), z_dir=(0, 8.9e-16, 1))) as fillet6_piece_7_section:
        Polygon((0, 0), (FILLET6_R, 0), (FILLET6_R, -FILLET6_R), (0, -FILLET6_R), align=None)
    fillet6_piece_7 = extrude(amount=FILLET6_R, mode=Mode.PRIVATE)
    fillet6_piece_7 = fillet6_piece_7 - Plane(origin=(15.5, -24.994897427831784, 4.5), x_dir=(-0.7071067811865475, 0.7071067811865475, 0), z_dir=(0, 8.9e-16, 1)) * Sphere(FILLET6_R, mode=Mode.PRIVATE)
    add(fillet6_piece_7, mode=Mode.SUBTRACT)
    with BuildSketch(Plane(origin=(15.5, -24.994897427831784, -4.5), x_dir=(1, 0, 0), z_dir=(0, 8.9e-16, -1))) as fillet6_piece_8_section:
        Polygon((0, 0), (FILLET6_R, 0), (FILLET6_R, FILLET6_R), (0, FILLET6_R), align=None)
    fillet6_piece_8 = extrude(amount=FILLET6_R, mode=Mode.PRIVATE)
    fillet6_piece_8 = fillet6_piece_8 - Plane(origin=(15.5, -24.994897427831784, -4.5), x_dir=(-0.7071067811865475, 0.7071067811865475, 0), z_dir=(0, 8.9e-16, -1)) * Sphere(FILLET6_R, mode=Mode.PRIVATE)
    add(fillet6_piece_8, mode=Mode.SUBTRACT)
    with BuildSketch(Plane(origin=(0, 0, 25), x_dir=(0, 0, -1), z_dir=(0, 1, 0))) as fillet6_piece_9:
        with BuildLine():
            CenterArc((FILLET6_R, -FILLET6_R), FILLET6_R, 90, 90)
            Line((0, -FILLET6_R), (0, 0))
            Line((0, 0), (FILLET6_R, 0))
        make_face()
    extrude(amount=4.5, mode=Mode.SUBTRACT)
    with BuildSketch(Plane(origin=(0, 0, -25), x_dir=(0, 0, 1), z_dir=(0, 1, 0))) as fillet6_piece_10:
        with BuildLine():
            CenterArc((FILLET6_R, FILLET6_R), FILLET6_R, 180, 90)
            Line((0, FILLET6_R), (0, 0))
            Line((0, 0), (FILLET6_R, 0))
        make_face()
    extrude(amount=4.5, mode=Mode.SUBTRACT)
    with BuildSketch(Plane(origin=(0, 3.55e-15, 5.33e-15), x_dir=(0, -1.4e-16, -1), z_dir=(0, 1, -1.4e-16))) as fillet6_piece_11:
        with BuildLine():
            CenterArc((25.000000000000007 - FILLET6_R, -FILLET6_R), FILLET6_R, 6.36e-15, 90)
            Line((25.000000000000007, -FILLET6_R), (25.000000000000007, 0))
            Line((25.000000000000007, 0), (25.000000000000007 - FILLET6_R, 0))
        make_face()
    revolve(axis=Axis((0, 3.55e-15, 5.33e-15), (-1, 0, 0)), revolution_arc=77.54420737409465, mode=Mode.SUBTRACT)
    with BuildSketch(Plane(origin=(0, -24.899799195977465, -4.999999999999999), x_dir=(0, -8.9e-16, 1), z_dir=(0, -1, -8.9e-16))) as fillet6_piece_12:
        with BuildLine():
            CenterArc((FILLET6_R, -FILLET6_R), FILLET6_R, 90, 90)
            Line((0, -FILLET6_R), (0, 0))
            Line((0, 0), (FILLET6_R, 0))
        make_face()
    extrude(amount=0.09509823185431898, mode=Mode.SUBTRACT)
    with BuildSketch(Plane(origin=(0, -24.994897427831784, 5), x_dir=(0, -8.9e-16, -1), z_dir=(0, 1, -8.9e-16))) as fillet6_piece_13:
        with BuildLine():
            CenterArc((FILLET6_R, -FILLET6_R), FILLET6_R, 90, 90)
            Line((0, -FILLET6_R), (0, 0))
            Line((0, 0), (FILLET6_R, 0))
        make_face()
    extrude(amount=0.09509823185432253, mode=Mode.SUBTRACT)
    with BuildSketch(Plane(origin=(16, 0, 25), x_dir=(-1, 0, 0), z_dir=(0, 1, 0))) as fillet6_piece_14:
        with BuildLine():
            CenterArc((FILLET6_R, -FILLET6_R), FILLET6_R, 90, 90)
            Line((0, -FILLET6_R), (0, 0))
            Line((0, 0), (FILLET6_R, 0))
        make_face()
    extrude(amount=4.5, mode=Mode.SUBTRACT)
    with BuildSketch(Plane(origin=(16, -24.994897427831784, 5), x_dir=(-1, 0, 0), z_dir=(0, 1, -8.9e-16))) as fillet6_piece_15:
        with BuildLine():
            CenterArc((FILLET6_R, -FILLET6_R), FILLET6_R, 90, 90)
            Line((0, -FILLET6_R), (0, 0))
            Line((0, 0), (FILLET6_R, 0))
        make_face()
    extrude(amount=0.09509823185432253, mode=Mode.SUBTRACT)
    with BuildSketch(Plane(origin=(16, -24.899799195977465, -4.999999999999999), x_dir=(-1, 0, 0), z_dir=(0, -1, -8.9e-16))) as fillet6_piece_16:
        with BuildLine():
            CenterArc((FILLET6_R, -FILLET6_R), FILLET6_R, 90, 90)
            Line((0, -FILLET6_R), (0, 0))
            Line((0, 0), (FILLET6_R, 0))
        make_face()
    extrude(amount=0.09509823185431898, mode=Mode.SUBTRACT)
    with BuildSketch(Plane(origin=(16, 3.55e-15, 5.33e-15), x_dir=(0, -1.4e-16, -1), z_dir=(0, 1, -1.4e-16))) as fillet6_piece_17:
        with BuildLine():
            CenterArc((25.000000000000007 - FILLET6_R, FILLET6_R), FILLET6_R, 270, 90)
            Line((25.000000000000007 - FILLET6_R, 0), (25.000000000000007, 0))
            Line((25.000000000000007, 0), (25.000000000000007, FILLET6_R))
        make_face()
    revolve(axis=Axis((16, 3.55e-15, 5.33e-15), (-1, 0, 0)), revolution_arc=77.54420737409465, mode=Mode.SUBTRACT)
    with BuildSketch(Plane(origin=(16, 0, -25), x_dir=(-1, 0, 0), z_dir=(0, 1, 0))) as fillet6_piece_18:
        with BuildLine():
            CenterArc((FILLET6_R, FILLET6_R), FILLET6_R, 180, 90)
            Line((0, FILLET6_R), (0, 0))
            Line((0, 0), (FILLET6_R, 0))
        make_face()
    extrude(amount=4.5, mode=Mode.SUBTRACT)
    with BuildSketch(Plane(origin=(0, -24.899799195977465, 5.5), x_dir=(0, 0.9764627135677445, -0.21568627450980027), z_dir=(0, 0.21568627450980027, 0.9764627135677445))) as fillet6_piece_19:
        with BuildLine():
            CenterArc((0.49999999999999845 + FILLET6_R, -FILLET6_R), FILLET6_R, 90, 90)
            Line((0.4999999999999982, -FILLET6_R), (0.49999999999999845, 0))
            Line((0.49999999999999845, 0), (0.49999999999999845 + FILLET6_R, 0))
        make_face()
    revolve(axis=Axis((0, -24.899799195977465, 5.5), (-1, 0, 0)), revolution_arc=77.54420737409448, mode=Mode.SUBTRACT)
    with BuildSketch(Plane(origin=(16, -24.899799195977465, 5.5), x_dir=(0, 0.9764627135677445, -0.21568627450980027), z_dir=(0, 0.21568627450980027, 0.9764627135677445))) as fillet6_piece_20:
        with BuildLine():
            CenterArc((0.49999999999999845 + FILLET6_R, FILLET6_R), FILLET6_R, 180, 89.9999999999996)
            Line((0.49999999999999845 + FILLET6_R, 0), (0.49999999999999845, 0))
            Line((0.49999999999999845, 0), (0.4999999999999982, FILLET6_R))
        make_face()
    revolve(axis=Axis((16, -24.899799195977465, 5.5), (-1, 0, 0)), revolution_arc=77.54420737409448, mode=Mode.SUBTRACT)
    with BuildSketch(Plane(origin=(0, -24.899799195977465, -5.5), x_dir=(0, 0.9764627135677431, 0.21568627450980704), z_dir=(0, 0.21568627450980704, -0.9764627135677431))) as fillet6_piece_21:
        with BuildLine():
            CenterArc((0.4999999999999993 + FILLET6_R, FILLET6_R), FILLET6_R, 180, 90)
            Line((0.49999999999999944, FILLET6_R), (0.4999999999999993, 0))
            Line((0.4999999999999993, 0), (0.4999999999999993 + FILLET6_R, 0))
        make_face()
    revolve(axis=Axis((0, -24.899799195977465, -5.5), (1, 0, 0)), revolution_arc=77.54420737409448, mode=Mode.SUBTRACT)
    with BuildSketch(Plane(origin=(16, -24.899799195977465, -5.5), x_dir=(0, 0.9764627135677431, 0.21568627450980704), z_dir=(0, 0.21568627450980704, -0.9764627135677431))) as fillet6_piece_22:
        with BuildLine():
            CenterArc((0.4999999999999993 + FILLET6_R, -FILLET6_R), FILLET6_R, 90.00000000000003, 90)
            Line((0.4999999999999993 + FILLET6_R, 0), (0.4999999999999993, 0))
            Line((0.4999999999999993, 0), (0.49999999999999944, -FILLET6_R))
        make_face()
    revolve(axis=Axis((16, -24.899799195977465, -5.5), (1, 0, 0)), revolution_arc=77.54420737409448, mode=Mode.SUBTRACT)
    with BuildSketch(Plane(origin=(16, 0, 8.9e-16), x_dir=(0, -0.9764627135677437, 0.21568627450980396), z_dir=(0, -0.21568627450980396, -0.9764627135677437))) as fillet6_piece_23:
        with BuildLine():
            CenterArc((25.000000000000004 - FILLET6_R, FILLET6_R), FILLET6_R, 270, 90)
            Line((25.000000000000004 - FILLET6_R, 0), (25.000000000000004, 0))
            Line((25.000000000000004, 0), (25.000000000000004, FILLET6_R))
        make_face()
    revolve(axis=Axis((16, 0, 8.9e-16), (-1, 0, 0)), revolution_arc=77.54420737409467, mode=Mode.SUBTRACT)
    with BuildSketch(Plane(origin=(0, 0, 8.9e-16), x_dir=(0, -0.9764627135677437, 0.21568627450980396), z_dir=(0, -0.21568627450980396, -0.9764627135677437))) as fillet6_piece_24:
        with BuildLine():
            CenterArc((25.000000000000004 - FILLET6_R, -FILLET6_R), FILLET6_R, 6.36e-15, 90)
            Line((25.000000000000004, -FILLET6_R), (25.000000000000004, 0))
            Line((25.000000000000004, 0), (25.000000000000004 - FILLET6_R, 0))
        make_face()
    revolve(axis=Axis((0, 0, 8.9e-16), (-1, 0, 0)), revolution_arc=77.54420737409467, mode=Mode.SUBTRACT)


solid = part.part
